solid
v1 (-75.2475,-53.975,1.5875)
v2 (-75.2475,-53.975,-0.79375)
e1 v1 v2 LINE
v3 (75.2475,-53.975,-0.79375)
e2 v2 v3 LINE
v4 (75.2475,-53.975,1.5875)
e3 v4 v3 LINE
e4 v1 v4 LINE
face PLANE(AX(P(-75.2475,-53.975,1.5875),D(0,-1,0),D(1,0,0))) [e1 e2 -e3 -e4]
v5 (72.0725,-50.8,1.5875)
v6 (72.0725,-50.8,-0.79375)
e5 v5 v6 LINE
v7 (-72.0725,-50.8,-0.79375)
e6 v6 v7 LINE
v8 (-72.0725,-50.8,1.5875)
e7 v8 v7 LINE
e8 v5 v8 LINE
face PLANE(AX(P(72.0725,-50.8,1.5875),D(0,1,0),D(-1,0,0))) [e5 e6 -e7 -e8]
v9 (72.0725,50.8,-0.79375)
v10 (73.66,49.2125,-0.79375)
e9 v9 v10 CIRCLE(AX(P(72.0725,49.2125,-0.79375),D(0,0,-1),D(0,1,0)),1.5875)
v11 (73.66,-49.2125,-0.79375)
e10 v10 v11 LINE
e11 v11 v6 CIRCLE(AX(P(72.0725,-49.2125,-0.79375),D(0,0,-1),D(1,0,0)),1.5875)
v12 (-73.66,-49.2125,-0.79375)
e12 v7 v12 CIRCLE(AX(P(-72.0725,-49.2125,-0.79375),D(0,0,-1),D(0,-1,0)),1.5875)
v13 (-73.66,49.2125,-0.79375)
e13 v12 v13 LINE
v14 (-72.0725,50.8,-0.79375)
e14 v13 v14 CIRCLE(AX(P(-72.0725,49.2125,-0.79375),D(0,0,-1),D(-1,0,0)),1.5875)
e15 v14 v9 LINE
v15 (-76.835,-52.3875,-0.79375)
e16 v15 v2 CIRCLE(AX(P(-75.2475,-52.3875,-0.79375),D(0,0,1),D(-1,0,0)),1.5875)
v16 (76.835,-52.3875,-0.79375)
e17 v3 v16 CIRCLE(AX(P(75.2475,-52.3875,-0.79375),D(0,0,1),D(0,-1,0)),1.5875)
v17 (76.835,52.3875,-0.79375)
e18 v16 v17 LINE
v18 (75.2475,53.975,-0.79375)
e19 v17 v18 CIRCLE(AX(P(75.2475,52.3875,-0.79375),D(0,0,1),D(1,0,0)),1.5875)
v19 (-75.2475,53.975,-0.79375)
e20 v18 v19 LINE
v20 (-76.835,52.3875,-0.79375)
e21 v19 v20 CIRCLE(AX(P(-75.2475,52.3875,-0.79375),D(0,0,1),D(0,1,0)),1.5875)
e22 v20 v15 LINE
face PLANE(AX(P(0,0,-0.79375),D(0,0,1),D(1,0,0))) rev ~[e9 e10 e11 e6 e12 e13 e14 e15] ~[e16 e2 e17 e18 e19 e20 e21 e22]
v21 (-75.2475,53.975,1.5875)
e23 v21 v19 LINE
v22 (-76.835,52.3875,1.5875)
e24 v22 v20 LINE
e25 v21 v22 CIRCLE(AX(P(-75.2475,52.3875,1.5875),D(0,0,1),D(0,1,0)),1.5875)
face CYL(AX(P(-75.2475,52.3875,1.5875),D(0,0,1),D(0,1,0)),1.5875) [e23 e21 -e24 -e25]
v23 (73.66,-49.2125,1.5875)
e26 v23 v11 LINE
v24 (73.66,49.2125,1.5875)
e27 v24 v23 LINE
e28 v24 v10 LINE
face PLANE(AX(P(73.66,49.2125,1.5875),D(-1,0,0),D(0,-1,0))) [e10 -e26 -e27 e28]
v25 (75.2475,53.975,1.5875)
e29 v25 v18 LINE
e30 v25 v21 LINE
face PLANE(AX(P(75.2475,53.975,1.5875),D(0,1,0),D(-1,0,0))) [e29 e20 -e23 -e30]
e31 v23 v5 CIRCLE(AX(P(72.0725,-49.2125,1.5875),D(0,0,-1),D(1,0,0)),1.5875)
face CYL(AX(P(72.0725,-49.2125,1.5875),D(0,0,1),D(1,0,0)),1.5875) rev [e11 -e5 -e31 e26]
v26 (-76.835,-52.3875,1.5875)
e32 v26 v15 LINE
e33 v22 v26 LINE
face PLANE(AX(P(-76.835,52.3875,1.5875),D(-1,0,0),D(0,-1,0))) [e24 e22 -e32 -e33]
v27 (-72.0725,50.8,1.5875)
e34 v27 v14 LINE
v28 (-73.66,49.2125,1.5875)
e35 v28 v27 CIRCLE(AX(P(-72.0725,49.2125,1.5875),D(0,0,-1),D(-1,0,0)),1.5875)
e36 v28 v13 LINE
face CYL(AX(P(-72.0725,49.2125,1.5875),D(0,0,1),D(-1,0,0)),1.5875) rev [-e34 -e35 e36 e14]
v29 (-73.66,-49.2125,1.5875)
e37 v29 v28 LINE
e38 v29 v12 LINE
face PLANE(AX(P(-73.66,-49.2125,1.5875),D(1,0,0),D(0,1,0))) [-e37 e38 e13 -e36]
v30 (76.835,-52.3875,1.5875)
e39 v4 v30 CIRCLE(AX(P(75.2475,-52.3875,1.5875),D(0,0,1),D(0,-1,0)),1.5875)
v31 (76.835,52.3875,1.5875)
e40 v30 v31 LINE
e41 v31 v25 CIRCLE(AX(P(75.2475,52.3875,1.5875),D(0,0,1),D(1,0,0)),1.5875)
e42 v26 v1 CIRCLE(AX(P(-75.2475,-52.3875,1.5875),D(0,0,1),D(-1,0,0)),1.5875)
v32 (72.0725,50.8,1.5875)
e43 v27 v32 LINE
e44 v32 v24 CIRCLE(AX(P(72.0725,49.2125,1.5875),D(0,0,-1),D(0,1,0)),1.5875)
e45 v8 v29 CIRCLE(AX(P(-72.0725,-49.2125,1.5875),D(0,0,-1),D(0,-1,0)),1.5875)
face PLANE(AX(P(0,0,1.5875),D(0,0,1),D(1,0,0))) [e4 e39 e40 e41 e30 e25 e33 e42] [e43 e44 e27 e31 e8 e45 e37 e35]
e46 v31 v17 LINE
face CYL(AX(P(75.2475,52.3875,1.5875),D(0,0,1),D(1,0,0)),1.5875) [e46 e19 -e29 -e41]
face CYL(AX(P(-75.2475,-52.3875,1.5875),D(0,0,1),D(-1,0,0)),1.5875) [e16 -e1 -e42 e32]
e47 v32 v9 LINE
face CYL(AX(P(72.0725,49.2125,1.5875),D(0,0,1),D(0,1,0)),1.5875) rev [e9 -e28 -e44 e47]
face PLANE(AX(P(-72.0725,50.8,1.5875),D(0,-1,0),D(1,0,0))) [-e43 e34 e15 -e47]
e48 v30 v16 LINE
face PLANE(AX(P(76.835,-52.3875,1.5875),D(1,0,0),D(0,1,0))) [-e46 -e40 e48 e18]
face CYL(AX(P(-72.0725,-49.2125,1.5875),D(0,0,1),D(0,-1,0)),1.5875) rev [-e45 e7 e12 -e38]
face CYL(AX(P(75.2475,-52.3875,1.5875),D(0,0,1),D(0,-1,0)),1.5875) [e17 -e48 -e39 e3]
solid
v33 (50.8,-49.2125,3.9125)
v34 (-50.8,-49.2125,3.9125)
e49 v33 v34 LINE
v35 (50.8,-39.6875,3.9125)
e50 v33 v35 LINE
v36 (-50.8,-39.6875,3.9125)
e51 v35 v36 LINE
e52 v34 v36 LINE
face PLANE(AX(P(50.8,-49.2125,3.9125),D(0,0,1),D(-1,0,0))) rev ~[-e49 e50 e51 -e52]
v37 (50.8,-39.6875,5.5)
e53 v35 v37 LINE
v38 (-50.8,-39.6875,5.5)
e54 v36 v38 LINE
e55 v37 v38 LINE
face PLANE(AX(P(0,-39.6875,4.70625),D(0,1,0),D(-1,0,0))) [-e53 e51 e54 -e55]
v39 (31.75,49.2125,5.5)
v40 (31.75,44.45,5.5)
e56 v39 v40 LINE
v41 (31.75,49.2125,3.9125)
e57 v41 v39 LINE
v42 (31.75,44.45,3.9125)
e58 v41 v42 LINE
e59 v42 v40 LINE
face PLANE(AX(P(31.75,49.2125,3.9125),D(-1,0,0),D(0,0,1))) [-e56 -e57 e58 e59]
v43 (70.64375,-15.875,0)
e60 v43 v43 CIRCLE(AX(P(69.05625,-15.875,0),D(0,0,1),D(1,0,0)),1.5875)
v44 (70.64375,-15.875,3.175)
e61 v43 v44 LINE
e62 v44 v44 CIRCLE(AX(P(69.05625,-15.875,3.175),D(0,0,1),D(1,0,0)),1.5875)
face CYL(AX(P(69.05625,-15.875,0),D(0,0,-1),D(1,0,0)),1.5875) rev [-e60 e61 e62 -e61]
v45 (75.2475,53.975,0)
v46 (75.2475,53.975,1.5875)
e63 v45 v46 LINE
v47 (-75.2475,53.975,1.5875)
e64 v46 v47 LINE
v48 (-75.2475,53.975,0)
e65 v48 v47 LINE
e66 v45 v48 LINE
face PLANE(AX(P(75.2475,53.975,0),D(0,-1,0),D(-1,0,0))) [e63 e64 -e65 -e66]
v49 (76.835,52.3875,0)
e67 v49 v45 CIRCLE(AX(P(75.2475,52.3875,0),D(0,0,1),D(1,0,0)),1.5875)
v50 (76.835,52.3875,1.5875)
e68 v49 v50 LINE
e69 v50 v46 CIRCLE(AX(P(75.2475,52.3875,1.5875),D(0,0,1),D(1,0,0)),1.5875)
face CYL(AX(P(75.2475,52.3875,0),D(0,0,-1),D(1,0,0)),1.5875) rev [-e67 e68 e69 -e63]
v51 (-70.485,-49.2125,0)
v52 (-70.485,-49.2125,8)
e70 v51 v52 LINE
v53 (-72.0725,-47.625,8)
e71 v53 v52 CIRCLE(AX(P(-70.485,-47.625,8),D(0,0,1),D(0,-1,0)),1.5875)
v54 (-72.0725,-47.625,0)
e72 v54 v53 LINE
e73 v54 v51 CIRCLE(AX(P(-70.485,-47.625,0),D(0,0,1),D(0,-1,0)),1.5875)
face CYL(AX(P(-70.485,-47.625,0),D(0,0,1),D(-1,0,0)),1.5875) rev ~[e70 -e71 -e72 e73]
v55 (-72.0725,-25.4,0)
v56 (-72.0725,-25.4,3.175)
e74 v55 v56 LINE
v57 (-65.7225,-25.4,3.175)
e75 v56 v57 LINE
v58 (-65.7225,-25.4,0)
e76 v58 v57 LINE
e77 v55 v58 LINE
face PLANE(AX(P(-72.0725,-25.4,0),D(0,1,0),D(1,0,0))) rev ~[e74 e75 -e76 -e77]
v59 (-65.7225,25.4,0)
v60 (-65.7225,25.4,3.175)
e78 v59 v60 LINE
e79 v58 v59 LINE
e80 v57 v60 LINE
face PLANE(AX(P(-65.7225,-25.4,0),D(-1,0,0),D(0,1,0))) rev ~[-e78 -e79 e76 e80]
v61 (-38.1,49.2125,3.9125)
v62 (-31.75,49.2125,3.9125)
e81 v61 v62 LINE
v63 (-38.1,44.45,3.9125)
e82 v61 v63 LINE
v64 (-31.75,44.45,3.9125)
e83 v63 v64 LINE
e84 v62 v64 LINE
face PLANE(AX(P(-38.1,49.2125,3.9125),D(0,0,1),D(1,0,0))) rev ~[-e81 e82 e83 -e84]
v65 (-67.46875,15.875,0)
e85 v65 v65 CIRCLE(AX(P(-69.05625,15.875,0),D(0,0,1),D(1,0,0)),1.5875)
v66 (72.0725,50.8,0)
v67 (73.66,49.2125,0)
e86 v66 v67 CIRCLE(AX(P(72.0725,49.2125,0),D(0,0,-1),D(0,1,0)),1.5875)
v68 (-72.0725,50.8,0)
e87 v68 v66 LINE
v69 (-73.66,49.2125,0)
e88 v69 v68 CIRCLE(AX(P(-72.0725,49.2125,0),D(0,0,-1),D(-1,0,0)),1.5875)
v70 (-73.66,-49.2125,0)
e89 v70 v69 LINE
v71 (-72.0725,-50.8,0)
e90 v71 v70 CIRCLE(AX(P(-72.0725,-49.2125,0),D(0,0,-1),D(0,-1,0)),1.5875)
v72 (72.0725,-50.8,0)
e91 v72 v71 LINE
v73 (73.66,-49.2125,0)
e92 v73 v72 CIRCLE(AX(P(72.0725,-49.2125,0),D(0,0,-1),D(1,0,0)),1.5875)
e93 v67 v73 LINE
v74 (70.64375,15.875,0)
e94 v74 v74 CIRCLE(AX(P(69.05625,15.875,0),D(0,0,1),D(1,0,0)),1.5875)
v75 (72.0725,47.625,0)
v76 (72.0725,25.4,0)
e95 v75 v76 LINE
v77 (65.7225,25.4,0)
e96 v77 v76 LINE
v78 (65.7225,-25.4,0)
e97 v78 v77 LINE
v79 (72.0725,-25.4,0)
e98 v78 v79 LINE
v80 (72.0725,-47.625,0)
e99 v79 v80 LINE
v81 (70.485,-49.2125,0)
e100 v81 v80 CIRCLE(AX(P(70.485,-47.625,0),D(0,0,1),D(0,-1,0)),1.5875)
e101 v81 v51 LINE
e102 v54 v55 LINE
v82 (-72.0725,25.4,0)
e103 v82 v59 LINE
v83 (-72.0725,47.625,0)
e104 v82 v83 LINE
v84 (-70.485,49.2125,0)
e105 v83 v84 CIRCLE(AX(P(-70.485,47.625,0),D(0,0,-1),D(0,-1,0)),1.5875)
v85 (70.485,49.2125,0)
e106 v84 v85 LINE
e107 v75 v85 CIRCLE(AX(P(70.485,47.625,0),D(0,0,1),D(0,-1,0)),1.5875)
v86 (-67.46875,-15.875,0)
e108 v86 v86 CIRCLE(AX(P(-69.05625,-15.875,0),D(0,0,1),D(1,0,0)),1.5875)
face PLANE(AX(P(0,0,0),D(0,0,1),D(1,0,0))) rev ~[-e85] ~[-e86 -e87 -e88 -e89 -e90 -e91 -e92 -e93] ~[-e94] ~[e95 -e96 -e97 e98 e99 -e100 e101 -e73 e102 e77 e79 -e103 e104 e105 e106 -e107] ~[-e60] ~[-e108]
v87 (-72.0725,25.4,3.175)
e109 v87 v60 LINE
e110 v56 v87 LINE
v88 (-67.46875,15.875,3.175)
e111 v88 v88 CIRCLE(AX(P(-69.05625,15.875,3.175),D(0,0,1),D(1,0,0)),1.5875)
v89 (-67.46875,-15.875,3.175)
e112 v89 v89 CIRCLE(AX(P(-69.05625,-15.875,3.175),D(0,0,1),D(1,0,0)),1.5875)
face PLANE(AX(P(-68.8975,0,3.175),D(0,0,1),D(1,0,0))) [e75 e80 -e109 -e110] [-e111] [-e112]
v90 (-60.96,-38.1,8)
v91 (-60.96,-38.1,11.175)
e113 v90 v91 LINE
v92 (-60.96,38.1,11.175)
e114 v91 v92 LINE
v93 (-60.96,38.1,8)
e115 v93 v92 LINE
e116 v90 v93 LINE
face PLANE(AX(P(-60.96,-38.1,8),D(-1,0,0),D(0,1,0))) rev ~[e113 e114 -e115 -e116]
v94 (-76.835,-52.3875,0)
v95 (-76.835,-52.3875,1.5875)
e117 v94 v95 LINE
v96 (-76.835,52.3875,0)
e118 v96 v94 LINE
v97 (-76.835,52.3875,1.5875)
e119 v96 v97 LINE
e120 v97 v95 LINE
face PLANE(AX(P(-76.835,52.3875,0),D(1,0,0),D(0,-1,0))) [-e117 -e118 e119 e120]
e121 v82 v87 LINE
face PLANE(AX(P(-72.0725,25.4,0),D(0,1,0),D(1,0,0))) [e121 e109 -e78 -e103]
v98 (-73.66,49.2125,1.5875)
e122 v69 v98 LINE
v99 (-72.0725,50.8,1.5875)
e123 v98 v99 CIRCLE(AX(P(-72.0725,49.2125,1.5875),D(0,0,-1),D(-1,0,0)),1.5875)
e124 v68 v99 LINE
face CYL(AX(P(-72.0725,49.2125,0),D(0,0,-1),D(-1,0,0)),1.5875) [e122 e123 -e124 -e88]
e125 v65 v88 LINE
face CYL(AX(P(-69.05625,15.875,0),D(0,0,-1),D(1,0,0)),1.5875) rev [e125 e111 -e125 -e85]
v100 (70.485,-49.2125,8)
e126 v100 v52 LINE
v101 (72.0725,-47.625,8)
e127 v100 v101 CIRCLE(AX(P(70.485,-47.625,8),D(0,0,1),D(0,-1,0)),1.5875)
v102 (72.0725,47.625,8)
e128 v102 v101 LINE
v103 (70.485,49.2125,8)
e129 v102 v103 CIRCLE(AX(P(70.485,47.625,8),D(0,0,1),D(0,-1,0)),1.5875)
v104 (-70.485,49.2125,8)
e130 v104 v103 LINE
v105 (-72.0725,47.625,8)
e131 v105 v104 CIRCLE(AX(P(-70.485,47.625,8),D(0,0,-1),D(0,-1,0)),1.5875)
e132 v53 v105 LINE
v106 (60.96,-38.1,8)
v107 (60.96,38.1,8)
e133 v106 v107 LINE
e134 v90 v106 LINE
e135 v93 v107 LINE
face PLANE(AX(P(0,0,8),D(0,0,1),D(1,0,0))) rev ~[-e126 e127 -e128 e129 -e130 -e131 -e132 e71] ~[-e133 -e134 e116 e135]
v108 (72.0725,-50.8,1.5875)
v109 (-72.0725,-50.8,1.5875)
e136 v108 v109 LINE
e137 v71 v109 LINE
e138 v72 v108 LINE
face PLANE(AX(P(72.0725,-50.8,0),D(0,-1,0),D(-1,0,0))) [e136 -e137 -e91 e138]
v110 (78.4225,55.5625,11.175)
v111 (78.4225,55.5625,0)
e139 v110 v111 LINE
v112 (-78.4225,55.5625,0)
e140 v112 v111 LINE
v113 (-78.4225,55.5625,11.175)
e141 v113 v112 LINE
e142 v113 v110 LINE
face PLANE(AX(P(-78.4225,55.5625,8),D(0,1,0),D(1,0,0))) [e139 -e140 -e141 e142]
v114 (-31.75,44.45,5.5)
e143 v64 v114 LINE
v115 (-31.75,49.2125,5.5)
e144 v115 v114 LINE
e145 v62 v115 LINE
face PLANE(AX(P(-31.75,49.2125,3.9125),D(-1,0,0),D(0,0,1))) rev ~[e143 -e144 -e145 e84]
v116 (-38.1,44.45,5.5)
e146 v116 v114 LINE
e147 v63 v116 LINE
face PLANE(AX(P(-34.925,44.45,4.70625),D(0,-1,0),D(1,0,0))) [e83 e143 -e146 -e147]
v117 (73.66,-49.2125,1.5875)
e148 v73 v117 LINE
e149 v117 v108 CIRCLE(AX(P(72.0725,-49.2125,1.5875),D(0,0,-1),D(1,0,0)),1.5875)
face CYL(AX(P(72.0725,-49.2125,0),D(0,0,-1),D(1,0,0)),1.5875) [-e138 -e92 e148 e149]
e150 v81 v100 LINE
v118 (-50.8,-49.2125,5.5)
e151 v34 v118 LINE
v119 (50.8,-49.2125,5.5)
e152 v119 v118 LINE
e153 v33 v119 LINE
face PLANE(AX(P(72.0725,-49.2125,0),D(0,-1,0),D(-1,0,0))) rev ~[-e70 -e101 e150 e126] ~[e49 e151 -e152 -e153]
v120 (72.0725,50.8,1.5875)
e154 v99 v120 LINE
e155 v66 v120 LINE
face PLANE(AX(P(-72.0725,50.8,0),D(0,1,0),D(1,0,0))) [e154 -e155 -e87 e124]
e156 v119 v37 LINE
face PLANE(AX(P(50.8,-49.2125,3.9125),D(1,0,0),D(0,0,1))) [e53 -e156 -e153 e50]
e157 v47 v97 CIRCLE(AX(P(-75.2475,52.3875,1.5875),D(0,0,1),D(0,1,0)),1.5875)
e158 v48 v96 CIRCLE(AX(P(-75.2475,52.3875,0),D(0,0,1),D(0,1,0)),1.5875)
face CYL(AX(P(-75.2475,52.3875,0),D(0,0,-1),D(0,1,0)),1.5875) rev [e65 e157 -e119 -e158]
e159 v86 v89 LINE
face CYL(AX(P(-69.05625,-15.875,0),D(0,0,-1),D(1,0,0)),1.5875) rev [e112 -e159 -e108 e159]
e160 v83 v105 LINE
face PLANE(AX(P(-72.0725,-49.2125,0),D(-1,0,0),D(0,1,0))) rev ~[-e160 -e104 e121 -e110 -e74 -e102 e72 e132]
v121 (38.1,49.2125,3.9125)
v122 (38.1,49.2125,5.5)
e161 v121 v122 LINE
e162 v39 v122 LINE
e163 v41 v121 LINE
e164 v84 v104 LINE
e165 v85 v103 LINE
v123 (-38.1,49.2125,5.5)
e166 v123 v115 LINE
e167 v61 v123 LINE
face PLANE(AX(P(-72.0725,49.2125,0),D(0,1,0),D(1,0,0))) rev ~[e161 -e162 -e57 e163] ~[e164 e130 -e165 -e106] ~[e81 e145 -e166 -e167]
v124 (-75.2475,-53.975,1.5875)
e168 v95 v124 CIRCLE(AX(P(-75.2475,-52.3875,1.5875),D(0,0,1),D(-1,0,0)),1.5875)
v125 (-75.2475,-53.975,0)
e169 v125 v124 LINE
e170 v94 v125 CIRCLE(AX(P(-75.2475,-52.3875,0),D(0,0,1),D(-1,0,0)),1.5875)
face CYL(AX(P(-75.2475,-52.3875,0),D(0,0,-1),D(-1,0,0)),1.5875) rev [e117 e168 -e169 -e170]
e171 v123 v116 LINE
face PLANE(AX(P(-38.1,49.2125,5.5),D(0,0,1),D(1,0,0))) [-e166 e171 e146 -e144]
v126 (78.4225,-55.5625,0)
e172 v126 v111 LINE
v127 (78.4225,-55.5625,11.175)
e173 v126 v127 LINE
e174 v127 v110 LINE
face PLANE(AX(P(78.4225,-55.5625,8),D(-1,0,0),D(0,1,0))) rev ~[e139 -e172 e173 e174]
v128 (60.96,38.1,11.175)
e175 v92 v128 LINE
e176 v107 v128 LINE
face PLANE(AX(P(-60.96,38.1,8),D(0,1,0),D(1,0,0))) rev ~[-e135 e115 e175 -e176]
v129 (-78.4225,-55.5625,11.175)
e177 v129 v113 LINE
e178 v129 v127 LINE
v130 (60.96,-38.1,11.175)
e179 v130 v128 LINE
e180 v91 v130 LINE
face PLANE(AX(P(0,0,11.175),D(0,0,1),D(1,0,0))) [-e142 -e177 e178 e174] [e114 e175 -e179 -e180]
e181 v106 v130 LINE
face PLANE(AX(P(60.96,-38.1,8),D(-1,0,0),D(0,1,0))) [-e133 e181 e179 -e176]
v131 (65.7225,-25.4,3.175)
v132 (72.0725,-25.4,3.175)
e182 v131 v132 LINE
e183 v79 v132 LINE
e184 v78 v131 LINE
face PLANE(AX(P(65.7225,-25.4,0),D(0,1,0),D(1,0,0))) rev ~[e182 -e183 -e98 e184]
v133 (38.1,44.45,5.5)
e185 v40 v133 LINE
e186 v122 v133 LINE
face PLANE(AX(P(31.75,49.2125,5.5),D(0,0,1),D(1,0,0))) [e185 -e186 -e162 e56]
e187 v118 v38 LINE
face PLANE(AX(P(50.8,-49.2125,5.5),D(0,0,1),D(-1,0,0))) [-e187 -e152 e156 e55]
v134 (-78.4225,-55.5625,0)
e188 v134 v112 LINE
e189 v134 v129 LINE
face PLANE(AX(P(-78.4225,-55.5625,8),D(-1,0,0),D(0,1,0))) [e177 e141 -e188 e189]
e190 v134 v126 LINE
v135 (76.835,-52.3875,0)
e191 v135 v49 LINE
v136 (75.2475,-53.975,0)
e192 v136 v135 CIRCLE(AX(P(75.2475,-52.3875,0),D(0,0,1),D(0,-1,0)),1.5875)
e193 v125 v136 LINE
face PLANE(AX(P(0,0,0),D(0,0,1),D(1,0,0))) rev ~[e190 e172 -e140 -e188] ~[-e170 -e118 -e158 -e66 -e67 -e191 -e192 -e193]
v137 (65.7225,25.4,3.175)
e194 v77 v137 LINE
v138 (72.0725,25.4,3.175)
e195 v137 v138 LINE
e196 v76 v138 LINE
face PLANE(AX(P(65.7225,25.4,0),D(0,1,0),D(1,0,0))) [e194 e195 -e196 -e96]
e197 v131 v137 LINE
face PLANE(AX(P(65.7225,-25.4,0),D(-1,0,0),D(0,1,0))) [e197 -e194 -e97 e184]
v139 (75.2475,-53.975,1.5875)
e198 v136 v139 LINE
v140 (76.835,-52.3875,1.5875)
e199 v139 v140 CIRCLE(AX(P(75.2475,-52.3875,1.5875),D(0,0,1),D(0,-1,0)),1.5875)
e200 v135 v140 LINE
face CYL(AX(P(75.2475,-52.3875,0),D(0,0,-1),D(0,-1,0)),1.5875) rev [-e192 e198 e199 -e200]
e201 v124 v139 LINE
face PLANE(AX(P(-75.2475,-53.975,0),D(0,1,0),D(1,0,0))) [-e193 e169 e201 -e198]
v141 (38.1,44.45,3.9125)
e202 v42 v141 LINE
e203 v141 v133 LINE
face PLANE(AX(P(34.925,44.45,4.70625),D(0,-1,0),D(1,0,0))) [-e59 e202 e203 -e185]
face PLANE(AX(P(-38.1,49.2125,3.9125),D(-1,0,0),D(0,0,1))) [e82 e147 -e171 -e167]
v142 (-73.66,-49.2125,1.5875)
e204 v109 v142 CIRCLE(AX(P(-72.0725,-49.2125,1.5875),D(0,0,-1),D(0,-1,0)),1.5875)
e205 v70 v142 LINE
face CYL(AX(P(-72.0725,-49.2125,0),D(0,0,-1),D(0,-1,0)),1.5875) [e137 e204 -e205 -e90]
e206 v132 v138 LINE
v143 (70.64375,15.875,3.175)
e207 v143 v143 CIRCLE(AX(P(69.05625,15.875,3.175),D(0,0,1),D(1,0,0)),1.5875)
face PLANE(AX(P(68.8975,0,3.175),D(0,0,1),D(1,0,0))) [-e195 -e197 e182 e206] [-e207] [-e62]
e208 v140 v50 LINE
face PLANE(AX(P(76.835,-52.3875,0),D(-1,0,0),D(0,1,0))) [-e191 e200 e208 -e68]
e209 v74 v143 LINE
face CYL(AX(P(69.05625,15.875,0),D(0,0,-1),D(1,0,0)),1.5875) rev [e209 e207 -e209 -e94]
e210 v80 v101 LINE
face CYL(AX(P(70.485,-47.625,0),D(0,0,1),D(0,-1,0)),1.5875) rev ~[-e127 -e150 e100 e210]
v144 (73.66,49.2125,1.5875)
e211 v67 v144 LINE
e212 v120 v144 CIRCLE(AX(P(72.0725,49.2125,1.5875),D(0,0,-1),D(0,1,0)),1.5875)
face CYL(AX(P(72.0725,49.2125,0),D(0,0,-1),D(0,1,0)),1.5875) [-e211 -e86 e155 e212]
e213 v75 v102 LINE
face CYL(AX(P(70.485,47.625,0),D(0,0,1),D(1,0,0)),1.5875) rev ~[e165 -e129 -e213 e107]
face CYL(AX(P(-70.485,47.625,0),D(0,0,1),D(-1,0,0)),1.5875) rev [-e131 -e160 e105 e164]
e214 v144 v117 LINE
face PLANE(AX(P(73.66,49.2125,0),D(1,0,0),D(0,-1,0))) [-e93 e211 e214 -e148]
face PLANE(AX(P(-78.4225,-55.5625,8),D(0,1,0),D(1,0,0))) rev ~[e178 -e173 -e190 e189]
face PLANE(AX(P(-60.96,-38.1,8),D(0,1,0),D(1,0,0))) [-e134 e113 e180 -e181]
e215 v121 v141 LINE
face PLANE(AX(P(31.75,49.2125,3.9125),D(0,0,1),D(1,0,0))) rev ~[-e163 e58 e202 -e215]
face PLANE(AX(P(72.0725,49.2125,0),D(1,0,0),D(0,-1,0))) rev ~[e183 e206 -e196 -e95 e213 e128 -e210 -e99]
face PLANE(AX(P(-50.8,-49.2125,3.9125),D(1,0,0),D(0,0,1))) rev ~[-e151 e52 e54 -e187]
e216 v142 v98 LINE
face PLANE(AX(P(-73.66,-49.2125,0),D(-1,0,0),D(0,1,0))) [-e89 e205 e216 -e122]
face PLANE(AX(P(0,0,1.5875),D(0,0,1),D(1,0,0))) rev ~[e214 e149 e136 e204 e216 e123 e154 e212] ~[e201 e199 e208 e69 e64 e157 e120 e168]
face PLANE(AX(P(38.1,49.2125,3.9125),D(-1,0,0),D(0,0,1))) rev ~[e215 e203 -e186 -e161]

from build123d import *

# Parameters (mm, degrees)
F0_W      = 156.845
F0_H      = 111.125
F0_W_2    = 1.5875
F0_H_2    = 50.8
F1_DEPTH  = 8
F0_W_3    = 6.35
F0_R      = 1.5875
F2_DEPTH  = 3.175
F3_W      = 156.845
F3_H      = 111.125
F3_W_2    = 144.145
F3_H_2    = 98.425
F3_W_3    = 121.92
F3_H_3    = 76.2
F4_DEPTH  = 3.175
F5_R      = 1.5875
F6_W      = 101.6
F6_H      = 1.5875
F7_DEPTH  = 9.525
F8_W      = 6.35
F8_H      = 1.5875
F9_DEPTH  = 4.7625
F10_DEPTH = 1.5875
F11_DEPTH = 2.38125


with BuildPart() as f1:
    # F0 (on Top) → F1 (new body)
    with BuildSketch(Plane.XY):
        Rectangle(F0_W, F0_H)
        with BuildLine():
            Line((75.2475, -53.975), (-75.2475, -53.975))
            ThreePointArc((-75.2475, -53.975), (-76.3700320151, -53.5100320151), (-76.835, -52.3875))
            Line((-76.835, -52.3875), (-76.835, 52.3875))
            ThreePointArc((-76.835, 52.3875), (-76.3700320151, 53.5100320151), (-75.2475, 53.975))
            Line((-75.2475, 53.975), (75.2475, 53.975))
            ThreePointArc((75.2475, 53.975), (76.3700320151, 53.5100320151), (76.835, 52.3875))
            Line((76.835, 52.3875), (76.835, -52.3875))
            ThreePointArc((76.835, -52.3875), (76.3700320151, -53.5100320151), (75.2475, -53.975))
        make_face(mode=Mode.SUBTRACT)
        with BuildLine():
            ThreePointArc((-76.835, -52.3875), (-76.3700320151, -53.5100320151), (-75.2475, -53.975))
            Line((-75.2475, -53.975), (75.2475, -53.975))
            ThreePointArc((75.2475, -53.975), (76.3700320151, -53.5100320151), (76.835, -52.3875))
            Line((76.835, -52.3875), (76.835, 52.3875))
            ThreePointArc((76.835, 52.3875), (76.3700320151, 53.5100320151), (75.2475, 53.975))
            Line((75.2475, 53.975), (-75.2475, 53.975))
            ThreePointArc((-75.2475, 53.975), (-76.3700320151, 53.5100320151), (-76.835, 52.3875))
            Line((-76.835, 52.3875), (-76.835, -52.3875))
        make_face()
        with BuildLine():
            ThreePointArc((-73.66, 49.2125), (-73.1950320151, 50.3350320151), (-72.0725, 50.8))
            Line((-72.0725, 50.8), (72.0725, 50.8))
            ThreePointArc((72.0725, 50.8), (73.1950320151, 50.3350320151), (73.66, 49.2125))
            Line((73.66, 49.2125), (73.66, 25.4))
            Line((73.66, 25.4), (73.66, -25.4))
            Line((73.66, -25.4), (73.66, -49.2125))
            ThreePointArc((73.66, -49.2125), (73.1950320151, -50.3350320151), (72.0725, -50.8))
            Line((72.0725, -50.8), (-72.0725, -50.8))
            ThreePointArc((-72.0725, -50.8), (-73.1950320151, -50.3350320151), (-73.66, -49.2125))
            Line((-73.66, -49.2125), (-73.66, -25.4))
            Line((-73.66, -25.4), (-73.66, 25.4))
            Line((-73.66, 25.4), (-73.66, 49.2125))
        make_face(mode=Mode.SUBTRACT)
        with BuildLine():
            Line((-72.0725, -25.4), (-73.66, -25.4))
            Line((-73.66, -25.4), (-73.66, -49.2125))
            ThreePointArc((-73.66, -49.2125), (-73.1950320151, -50.3350320151), (-72.0725, -50.8))
            Line((-72.0725, -50.8), (72.0725, -50.8))
            ThreePointArc((72.0725, -50.8), (73.1950320151, -50.3350320151), (73.66, -49.2125))
            Line((73.66, -49.2125), (73.66, -25.4))
            Line((73.66, -25.4), (72.0725, -25.4))
            Line((72.0725, -25.4), (72.0725, -49.2125))
            Line((72.0725, -49.2125), (-72.0725, -49.2125))
            Line((-72.0725, -49.2125), (-72.0725, -25.4))
        make_face()
        with BuildLine():
            Line((72.0725, 50.8), (-72.0725, 50.8))
            ThreePointArc((-72.0725, 50.8), (-73.1950320151, 50.3350320151), (-73.66, 49.2125))
            Line((-73.66, 49.2125), (-73.66, 25.4))
            Line((-73.66, 25.4), (-72.0725, 25.4))
            Line((-72.0725, 25.4), (-72.0725, 49.2125))
            Line((-72.0725, 49.2125), (72.0725, 49.2125))
            Line((72.0725, 49.2125), (72.0725, 25.4))
            Line((72.0725, 25.4), (73.66, 25.4))
            Line((73.66, 25.4), (73.66, 49.2125))
            ThreePointArc((73.66, 49.2125), (73.1950320151, 50.3350320151), (72.0725, 50.8))
        make_face()
        with Locations((-72.86625, 0)):
            Rectangle(F0_W_2, F0_H_2)
        with Locations((72.86625, 0)):
            Rectangle(F0_W_2, F0_H_2)
    extrude(amount=F1_DEPTH)

    # F0 (on Top) → F2 (join)
    with BuildSketch(Plane.XY):
        with Locations((68.8975, 0)):
            Rectangle(F0_W_3, F0_H_2)
        with Locations((69.05625, -15.875)):
            Circle(F0_R, mode=Mode.SUBTRACT)
        with Locations((69.05625, 15.875)):
            Circle(F0_R, mode=Mode.SUBTRACT)
        with Locations((-68.8975, 0)):
            Rectangle(F0_W_3, F0_H_2)
        with Locations((-69.05625, -15.875)):
            Circle(F0_R, mode=Mode.SUBTRACT)
        with Locations((-69.05625, 15.875)):
            Circle(F0_R, mode=Mode.SUBTRACT)
    extrude(amount=F2_DEPTH)

    # F3 (on face) → F4 (join)
    with BuildSketch(Plane.XY.offset(8)):
        Rectangle(F3_W, F3_H)
        Rectangle(F3_W_2, F3_H_2, mode=Mode.SUBTRACT)
        Rectangle(F3_W_2, F3_H_2)
        Rectangle(F3_W_3, F3_H_3, mode=Mode.SUBTRACT)
    extrude(amount=F4_DEPTH)

    # F5
    f5_edges = [f1.edges().sort_by_distance(p)[0] for p in [
        (-72.0725, -49.2125, 4),
        (-72.0725, 49.2125, 4),
        (72.0725, -49.2125, 4),
        (72.0725, 49.2125, 4),
    ]]
    fillet(f5_edges, radius=F5_R)

    # F6 (on face) → F7 (join)
    with BuildSketch(Plane(origin=(0, -49.2125, 0), x_dir=(-1, 0, 0), z_dir=(0, 1, 0))):
        with Locations((0, 4.70625)):
            Rectangle(F6_W, F6_H)
    extrude(amount=F7_DEPTH)

    # F8 (on face) → F9 (join)
    with BuildSketch(Plane.XZ.offset(-49.2125)):
        with Locations((-34.925, 4.70625)):
            Rectangle(F8_W, F8_H)
        with Locations((34.925, 4.70625)):
            Rectangle(F8_W, F8_H)
    extrude(amount=F9_DEPTH)

    # F0 (on Top) → F10 (cut)
    with BuildSketch(Plane.XY):
        with BuildLine():
            ThreePointArc((-76.835, -52.3875), (-76.3700320151, -53.5100320151), (-75.2475, -53.975))
            Line((-75.2475, -53.975), (75.2475, -53.975))
            ThreePointArc((75.2475, -53.975), (76.3700320151, -53.5100320151), (76.835, -52.3875))
            Line((76.835, -52.3875), (76.835, 52.3875))
            ThreePointArc((76.835, 52.3875), (76.3700320151, 53.5100320151), (75.2475, 53.975))
            Line((75.2475, 53.975), (-75.2475, 53.975))
            ThreePointArc((-75.2475, 53.975), (-76.3700320151, 53.5100320151), (-76.835, 52.3875))
            Line((-76.835, 52.3875), (-76.835, -52.3875))
        make_face()
        with BuildLine():
            ThreePointArc((-73.66, 49.2125), (-73.1950320151, 50.3350320151), (-72.0725, 50.8))
            Line((-72.0725, 50.8), (72.0725, 50.8))
            ThreePointArc((72.0725, 50.8), (73.1950320151, 50.3350320151), (73.66, 49.2125))
            Line((73.66, 49.2125), (73.66, 25.4))
            Line((73.66, 25.4), (73.66, -25.4))
            Line((73.66, -25.4), (73.66, -49.2125))
            ThreePointArc((73.66, -49.2125), (73.1950320151, -50.3350320151), (72.0725, -50.8))
            Line((72.0725, -50.8), (-72.0725, -50.8))
            ThreePointArc((-72.0725, -50.8), (-73.1950320151, -50.3350320151), (-73.66, -49.2125))
            Line((-73.66, -49.2125), (-73.66, -25.4))
            Line((-73.66, -25.4), (-73.66, 25.4))
            Line((-73.66, 25.4), (-73.66, 49.2125))
        make_face(mode=Mode.SUBTRACT)
    extrude(amount=F10_DEPTH, mode=Mode.SUBTRACT)


with BuildPart() as f11:
    # F11 (new): a face of the model
    f11_faces = [f1.part.faces().sort_by_distance(p)[0] for p in [
        (-75.0421074804, 52.1821074804, 1.5875),
    ]]
    extrude(f11_faces, amount=F11_DEPTH)


solid = Compound([f1.part, f11.part])
